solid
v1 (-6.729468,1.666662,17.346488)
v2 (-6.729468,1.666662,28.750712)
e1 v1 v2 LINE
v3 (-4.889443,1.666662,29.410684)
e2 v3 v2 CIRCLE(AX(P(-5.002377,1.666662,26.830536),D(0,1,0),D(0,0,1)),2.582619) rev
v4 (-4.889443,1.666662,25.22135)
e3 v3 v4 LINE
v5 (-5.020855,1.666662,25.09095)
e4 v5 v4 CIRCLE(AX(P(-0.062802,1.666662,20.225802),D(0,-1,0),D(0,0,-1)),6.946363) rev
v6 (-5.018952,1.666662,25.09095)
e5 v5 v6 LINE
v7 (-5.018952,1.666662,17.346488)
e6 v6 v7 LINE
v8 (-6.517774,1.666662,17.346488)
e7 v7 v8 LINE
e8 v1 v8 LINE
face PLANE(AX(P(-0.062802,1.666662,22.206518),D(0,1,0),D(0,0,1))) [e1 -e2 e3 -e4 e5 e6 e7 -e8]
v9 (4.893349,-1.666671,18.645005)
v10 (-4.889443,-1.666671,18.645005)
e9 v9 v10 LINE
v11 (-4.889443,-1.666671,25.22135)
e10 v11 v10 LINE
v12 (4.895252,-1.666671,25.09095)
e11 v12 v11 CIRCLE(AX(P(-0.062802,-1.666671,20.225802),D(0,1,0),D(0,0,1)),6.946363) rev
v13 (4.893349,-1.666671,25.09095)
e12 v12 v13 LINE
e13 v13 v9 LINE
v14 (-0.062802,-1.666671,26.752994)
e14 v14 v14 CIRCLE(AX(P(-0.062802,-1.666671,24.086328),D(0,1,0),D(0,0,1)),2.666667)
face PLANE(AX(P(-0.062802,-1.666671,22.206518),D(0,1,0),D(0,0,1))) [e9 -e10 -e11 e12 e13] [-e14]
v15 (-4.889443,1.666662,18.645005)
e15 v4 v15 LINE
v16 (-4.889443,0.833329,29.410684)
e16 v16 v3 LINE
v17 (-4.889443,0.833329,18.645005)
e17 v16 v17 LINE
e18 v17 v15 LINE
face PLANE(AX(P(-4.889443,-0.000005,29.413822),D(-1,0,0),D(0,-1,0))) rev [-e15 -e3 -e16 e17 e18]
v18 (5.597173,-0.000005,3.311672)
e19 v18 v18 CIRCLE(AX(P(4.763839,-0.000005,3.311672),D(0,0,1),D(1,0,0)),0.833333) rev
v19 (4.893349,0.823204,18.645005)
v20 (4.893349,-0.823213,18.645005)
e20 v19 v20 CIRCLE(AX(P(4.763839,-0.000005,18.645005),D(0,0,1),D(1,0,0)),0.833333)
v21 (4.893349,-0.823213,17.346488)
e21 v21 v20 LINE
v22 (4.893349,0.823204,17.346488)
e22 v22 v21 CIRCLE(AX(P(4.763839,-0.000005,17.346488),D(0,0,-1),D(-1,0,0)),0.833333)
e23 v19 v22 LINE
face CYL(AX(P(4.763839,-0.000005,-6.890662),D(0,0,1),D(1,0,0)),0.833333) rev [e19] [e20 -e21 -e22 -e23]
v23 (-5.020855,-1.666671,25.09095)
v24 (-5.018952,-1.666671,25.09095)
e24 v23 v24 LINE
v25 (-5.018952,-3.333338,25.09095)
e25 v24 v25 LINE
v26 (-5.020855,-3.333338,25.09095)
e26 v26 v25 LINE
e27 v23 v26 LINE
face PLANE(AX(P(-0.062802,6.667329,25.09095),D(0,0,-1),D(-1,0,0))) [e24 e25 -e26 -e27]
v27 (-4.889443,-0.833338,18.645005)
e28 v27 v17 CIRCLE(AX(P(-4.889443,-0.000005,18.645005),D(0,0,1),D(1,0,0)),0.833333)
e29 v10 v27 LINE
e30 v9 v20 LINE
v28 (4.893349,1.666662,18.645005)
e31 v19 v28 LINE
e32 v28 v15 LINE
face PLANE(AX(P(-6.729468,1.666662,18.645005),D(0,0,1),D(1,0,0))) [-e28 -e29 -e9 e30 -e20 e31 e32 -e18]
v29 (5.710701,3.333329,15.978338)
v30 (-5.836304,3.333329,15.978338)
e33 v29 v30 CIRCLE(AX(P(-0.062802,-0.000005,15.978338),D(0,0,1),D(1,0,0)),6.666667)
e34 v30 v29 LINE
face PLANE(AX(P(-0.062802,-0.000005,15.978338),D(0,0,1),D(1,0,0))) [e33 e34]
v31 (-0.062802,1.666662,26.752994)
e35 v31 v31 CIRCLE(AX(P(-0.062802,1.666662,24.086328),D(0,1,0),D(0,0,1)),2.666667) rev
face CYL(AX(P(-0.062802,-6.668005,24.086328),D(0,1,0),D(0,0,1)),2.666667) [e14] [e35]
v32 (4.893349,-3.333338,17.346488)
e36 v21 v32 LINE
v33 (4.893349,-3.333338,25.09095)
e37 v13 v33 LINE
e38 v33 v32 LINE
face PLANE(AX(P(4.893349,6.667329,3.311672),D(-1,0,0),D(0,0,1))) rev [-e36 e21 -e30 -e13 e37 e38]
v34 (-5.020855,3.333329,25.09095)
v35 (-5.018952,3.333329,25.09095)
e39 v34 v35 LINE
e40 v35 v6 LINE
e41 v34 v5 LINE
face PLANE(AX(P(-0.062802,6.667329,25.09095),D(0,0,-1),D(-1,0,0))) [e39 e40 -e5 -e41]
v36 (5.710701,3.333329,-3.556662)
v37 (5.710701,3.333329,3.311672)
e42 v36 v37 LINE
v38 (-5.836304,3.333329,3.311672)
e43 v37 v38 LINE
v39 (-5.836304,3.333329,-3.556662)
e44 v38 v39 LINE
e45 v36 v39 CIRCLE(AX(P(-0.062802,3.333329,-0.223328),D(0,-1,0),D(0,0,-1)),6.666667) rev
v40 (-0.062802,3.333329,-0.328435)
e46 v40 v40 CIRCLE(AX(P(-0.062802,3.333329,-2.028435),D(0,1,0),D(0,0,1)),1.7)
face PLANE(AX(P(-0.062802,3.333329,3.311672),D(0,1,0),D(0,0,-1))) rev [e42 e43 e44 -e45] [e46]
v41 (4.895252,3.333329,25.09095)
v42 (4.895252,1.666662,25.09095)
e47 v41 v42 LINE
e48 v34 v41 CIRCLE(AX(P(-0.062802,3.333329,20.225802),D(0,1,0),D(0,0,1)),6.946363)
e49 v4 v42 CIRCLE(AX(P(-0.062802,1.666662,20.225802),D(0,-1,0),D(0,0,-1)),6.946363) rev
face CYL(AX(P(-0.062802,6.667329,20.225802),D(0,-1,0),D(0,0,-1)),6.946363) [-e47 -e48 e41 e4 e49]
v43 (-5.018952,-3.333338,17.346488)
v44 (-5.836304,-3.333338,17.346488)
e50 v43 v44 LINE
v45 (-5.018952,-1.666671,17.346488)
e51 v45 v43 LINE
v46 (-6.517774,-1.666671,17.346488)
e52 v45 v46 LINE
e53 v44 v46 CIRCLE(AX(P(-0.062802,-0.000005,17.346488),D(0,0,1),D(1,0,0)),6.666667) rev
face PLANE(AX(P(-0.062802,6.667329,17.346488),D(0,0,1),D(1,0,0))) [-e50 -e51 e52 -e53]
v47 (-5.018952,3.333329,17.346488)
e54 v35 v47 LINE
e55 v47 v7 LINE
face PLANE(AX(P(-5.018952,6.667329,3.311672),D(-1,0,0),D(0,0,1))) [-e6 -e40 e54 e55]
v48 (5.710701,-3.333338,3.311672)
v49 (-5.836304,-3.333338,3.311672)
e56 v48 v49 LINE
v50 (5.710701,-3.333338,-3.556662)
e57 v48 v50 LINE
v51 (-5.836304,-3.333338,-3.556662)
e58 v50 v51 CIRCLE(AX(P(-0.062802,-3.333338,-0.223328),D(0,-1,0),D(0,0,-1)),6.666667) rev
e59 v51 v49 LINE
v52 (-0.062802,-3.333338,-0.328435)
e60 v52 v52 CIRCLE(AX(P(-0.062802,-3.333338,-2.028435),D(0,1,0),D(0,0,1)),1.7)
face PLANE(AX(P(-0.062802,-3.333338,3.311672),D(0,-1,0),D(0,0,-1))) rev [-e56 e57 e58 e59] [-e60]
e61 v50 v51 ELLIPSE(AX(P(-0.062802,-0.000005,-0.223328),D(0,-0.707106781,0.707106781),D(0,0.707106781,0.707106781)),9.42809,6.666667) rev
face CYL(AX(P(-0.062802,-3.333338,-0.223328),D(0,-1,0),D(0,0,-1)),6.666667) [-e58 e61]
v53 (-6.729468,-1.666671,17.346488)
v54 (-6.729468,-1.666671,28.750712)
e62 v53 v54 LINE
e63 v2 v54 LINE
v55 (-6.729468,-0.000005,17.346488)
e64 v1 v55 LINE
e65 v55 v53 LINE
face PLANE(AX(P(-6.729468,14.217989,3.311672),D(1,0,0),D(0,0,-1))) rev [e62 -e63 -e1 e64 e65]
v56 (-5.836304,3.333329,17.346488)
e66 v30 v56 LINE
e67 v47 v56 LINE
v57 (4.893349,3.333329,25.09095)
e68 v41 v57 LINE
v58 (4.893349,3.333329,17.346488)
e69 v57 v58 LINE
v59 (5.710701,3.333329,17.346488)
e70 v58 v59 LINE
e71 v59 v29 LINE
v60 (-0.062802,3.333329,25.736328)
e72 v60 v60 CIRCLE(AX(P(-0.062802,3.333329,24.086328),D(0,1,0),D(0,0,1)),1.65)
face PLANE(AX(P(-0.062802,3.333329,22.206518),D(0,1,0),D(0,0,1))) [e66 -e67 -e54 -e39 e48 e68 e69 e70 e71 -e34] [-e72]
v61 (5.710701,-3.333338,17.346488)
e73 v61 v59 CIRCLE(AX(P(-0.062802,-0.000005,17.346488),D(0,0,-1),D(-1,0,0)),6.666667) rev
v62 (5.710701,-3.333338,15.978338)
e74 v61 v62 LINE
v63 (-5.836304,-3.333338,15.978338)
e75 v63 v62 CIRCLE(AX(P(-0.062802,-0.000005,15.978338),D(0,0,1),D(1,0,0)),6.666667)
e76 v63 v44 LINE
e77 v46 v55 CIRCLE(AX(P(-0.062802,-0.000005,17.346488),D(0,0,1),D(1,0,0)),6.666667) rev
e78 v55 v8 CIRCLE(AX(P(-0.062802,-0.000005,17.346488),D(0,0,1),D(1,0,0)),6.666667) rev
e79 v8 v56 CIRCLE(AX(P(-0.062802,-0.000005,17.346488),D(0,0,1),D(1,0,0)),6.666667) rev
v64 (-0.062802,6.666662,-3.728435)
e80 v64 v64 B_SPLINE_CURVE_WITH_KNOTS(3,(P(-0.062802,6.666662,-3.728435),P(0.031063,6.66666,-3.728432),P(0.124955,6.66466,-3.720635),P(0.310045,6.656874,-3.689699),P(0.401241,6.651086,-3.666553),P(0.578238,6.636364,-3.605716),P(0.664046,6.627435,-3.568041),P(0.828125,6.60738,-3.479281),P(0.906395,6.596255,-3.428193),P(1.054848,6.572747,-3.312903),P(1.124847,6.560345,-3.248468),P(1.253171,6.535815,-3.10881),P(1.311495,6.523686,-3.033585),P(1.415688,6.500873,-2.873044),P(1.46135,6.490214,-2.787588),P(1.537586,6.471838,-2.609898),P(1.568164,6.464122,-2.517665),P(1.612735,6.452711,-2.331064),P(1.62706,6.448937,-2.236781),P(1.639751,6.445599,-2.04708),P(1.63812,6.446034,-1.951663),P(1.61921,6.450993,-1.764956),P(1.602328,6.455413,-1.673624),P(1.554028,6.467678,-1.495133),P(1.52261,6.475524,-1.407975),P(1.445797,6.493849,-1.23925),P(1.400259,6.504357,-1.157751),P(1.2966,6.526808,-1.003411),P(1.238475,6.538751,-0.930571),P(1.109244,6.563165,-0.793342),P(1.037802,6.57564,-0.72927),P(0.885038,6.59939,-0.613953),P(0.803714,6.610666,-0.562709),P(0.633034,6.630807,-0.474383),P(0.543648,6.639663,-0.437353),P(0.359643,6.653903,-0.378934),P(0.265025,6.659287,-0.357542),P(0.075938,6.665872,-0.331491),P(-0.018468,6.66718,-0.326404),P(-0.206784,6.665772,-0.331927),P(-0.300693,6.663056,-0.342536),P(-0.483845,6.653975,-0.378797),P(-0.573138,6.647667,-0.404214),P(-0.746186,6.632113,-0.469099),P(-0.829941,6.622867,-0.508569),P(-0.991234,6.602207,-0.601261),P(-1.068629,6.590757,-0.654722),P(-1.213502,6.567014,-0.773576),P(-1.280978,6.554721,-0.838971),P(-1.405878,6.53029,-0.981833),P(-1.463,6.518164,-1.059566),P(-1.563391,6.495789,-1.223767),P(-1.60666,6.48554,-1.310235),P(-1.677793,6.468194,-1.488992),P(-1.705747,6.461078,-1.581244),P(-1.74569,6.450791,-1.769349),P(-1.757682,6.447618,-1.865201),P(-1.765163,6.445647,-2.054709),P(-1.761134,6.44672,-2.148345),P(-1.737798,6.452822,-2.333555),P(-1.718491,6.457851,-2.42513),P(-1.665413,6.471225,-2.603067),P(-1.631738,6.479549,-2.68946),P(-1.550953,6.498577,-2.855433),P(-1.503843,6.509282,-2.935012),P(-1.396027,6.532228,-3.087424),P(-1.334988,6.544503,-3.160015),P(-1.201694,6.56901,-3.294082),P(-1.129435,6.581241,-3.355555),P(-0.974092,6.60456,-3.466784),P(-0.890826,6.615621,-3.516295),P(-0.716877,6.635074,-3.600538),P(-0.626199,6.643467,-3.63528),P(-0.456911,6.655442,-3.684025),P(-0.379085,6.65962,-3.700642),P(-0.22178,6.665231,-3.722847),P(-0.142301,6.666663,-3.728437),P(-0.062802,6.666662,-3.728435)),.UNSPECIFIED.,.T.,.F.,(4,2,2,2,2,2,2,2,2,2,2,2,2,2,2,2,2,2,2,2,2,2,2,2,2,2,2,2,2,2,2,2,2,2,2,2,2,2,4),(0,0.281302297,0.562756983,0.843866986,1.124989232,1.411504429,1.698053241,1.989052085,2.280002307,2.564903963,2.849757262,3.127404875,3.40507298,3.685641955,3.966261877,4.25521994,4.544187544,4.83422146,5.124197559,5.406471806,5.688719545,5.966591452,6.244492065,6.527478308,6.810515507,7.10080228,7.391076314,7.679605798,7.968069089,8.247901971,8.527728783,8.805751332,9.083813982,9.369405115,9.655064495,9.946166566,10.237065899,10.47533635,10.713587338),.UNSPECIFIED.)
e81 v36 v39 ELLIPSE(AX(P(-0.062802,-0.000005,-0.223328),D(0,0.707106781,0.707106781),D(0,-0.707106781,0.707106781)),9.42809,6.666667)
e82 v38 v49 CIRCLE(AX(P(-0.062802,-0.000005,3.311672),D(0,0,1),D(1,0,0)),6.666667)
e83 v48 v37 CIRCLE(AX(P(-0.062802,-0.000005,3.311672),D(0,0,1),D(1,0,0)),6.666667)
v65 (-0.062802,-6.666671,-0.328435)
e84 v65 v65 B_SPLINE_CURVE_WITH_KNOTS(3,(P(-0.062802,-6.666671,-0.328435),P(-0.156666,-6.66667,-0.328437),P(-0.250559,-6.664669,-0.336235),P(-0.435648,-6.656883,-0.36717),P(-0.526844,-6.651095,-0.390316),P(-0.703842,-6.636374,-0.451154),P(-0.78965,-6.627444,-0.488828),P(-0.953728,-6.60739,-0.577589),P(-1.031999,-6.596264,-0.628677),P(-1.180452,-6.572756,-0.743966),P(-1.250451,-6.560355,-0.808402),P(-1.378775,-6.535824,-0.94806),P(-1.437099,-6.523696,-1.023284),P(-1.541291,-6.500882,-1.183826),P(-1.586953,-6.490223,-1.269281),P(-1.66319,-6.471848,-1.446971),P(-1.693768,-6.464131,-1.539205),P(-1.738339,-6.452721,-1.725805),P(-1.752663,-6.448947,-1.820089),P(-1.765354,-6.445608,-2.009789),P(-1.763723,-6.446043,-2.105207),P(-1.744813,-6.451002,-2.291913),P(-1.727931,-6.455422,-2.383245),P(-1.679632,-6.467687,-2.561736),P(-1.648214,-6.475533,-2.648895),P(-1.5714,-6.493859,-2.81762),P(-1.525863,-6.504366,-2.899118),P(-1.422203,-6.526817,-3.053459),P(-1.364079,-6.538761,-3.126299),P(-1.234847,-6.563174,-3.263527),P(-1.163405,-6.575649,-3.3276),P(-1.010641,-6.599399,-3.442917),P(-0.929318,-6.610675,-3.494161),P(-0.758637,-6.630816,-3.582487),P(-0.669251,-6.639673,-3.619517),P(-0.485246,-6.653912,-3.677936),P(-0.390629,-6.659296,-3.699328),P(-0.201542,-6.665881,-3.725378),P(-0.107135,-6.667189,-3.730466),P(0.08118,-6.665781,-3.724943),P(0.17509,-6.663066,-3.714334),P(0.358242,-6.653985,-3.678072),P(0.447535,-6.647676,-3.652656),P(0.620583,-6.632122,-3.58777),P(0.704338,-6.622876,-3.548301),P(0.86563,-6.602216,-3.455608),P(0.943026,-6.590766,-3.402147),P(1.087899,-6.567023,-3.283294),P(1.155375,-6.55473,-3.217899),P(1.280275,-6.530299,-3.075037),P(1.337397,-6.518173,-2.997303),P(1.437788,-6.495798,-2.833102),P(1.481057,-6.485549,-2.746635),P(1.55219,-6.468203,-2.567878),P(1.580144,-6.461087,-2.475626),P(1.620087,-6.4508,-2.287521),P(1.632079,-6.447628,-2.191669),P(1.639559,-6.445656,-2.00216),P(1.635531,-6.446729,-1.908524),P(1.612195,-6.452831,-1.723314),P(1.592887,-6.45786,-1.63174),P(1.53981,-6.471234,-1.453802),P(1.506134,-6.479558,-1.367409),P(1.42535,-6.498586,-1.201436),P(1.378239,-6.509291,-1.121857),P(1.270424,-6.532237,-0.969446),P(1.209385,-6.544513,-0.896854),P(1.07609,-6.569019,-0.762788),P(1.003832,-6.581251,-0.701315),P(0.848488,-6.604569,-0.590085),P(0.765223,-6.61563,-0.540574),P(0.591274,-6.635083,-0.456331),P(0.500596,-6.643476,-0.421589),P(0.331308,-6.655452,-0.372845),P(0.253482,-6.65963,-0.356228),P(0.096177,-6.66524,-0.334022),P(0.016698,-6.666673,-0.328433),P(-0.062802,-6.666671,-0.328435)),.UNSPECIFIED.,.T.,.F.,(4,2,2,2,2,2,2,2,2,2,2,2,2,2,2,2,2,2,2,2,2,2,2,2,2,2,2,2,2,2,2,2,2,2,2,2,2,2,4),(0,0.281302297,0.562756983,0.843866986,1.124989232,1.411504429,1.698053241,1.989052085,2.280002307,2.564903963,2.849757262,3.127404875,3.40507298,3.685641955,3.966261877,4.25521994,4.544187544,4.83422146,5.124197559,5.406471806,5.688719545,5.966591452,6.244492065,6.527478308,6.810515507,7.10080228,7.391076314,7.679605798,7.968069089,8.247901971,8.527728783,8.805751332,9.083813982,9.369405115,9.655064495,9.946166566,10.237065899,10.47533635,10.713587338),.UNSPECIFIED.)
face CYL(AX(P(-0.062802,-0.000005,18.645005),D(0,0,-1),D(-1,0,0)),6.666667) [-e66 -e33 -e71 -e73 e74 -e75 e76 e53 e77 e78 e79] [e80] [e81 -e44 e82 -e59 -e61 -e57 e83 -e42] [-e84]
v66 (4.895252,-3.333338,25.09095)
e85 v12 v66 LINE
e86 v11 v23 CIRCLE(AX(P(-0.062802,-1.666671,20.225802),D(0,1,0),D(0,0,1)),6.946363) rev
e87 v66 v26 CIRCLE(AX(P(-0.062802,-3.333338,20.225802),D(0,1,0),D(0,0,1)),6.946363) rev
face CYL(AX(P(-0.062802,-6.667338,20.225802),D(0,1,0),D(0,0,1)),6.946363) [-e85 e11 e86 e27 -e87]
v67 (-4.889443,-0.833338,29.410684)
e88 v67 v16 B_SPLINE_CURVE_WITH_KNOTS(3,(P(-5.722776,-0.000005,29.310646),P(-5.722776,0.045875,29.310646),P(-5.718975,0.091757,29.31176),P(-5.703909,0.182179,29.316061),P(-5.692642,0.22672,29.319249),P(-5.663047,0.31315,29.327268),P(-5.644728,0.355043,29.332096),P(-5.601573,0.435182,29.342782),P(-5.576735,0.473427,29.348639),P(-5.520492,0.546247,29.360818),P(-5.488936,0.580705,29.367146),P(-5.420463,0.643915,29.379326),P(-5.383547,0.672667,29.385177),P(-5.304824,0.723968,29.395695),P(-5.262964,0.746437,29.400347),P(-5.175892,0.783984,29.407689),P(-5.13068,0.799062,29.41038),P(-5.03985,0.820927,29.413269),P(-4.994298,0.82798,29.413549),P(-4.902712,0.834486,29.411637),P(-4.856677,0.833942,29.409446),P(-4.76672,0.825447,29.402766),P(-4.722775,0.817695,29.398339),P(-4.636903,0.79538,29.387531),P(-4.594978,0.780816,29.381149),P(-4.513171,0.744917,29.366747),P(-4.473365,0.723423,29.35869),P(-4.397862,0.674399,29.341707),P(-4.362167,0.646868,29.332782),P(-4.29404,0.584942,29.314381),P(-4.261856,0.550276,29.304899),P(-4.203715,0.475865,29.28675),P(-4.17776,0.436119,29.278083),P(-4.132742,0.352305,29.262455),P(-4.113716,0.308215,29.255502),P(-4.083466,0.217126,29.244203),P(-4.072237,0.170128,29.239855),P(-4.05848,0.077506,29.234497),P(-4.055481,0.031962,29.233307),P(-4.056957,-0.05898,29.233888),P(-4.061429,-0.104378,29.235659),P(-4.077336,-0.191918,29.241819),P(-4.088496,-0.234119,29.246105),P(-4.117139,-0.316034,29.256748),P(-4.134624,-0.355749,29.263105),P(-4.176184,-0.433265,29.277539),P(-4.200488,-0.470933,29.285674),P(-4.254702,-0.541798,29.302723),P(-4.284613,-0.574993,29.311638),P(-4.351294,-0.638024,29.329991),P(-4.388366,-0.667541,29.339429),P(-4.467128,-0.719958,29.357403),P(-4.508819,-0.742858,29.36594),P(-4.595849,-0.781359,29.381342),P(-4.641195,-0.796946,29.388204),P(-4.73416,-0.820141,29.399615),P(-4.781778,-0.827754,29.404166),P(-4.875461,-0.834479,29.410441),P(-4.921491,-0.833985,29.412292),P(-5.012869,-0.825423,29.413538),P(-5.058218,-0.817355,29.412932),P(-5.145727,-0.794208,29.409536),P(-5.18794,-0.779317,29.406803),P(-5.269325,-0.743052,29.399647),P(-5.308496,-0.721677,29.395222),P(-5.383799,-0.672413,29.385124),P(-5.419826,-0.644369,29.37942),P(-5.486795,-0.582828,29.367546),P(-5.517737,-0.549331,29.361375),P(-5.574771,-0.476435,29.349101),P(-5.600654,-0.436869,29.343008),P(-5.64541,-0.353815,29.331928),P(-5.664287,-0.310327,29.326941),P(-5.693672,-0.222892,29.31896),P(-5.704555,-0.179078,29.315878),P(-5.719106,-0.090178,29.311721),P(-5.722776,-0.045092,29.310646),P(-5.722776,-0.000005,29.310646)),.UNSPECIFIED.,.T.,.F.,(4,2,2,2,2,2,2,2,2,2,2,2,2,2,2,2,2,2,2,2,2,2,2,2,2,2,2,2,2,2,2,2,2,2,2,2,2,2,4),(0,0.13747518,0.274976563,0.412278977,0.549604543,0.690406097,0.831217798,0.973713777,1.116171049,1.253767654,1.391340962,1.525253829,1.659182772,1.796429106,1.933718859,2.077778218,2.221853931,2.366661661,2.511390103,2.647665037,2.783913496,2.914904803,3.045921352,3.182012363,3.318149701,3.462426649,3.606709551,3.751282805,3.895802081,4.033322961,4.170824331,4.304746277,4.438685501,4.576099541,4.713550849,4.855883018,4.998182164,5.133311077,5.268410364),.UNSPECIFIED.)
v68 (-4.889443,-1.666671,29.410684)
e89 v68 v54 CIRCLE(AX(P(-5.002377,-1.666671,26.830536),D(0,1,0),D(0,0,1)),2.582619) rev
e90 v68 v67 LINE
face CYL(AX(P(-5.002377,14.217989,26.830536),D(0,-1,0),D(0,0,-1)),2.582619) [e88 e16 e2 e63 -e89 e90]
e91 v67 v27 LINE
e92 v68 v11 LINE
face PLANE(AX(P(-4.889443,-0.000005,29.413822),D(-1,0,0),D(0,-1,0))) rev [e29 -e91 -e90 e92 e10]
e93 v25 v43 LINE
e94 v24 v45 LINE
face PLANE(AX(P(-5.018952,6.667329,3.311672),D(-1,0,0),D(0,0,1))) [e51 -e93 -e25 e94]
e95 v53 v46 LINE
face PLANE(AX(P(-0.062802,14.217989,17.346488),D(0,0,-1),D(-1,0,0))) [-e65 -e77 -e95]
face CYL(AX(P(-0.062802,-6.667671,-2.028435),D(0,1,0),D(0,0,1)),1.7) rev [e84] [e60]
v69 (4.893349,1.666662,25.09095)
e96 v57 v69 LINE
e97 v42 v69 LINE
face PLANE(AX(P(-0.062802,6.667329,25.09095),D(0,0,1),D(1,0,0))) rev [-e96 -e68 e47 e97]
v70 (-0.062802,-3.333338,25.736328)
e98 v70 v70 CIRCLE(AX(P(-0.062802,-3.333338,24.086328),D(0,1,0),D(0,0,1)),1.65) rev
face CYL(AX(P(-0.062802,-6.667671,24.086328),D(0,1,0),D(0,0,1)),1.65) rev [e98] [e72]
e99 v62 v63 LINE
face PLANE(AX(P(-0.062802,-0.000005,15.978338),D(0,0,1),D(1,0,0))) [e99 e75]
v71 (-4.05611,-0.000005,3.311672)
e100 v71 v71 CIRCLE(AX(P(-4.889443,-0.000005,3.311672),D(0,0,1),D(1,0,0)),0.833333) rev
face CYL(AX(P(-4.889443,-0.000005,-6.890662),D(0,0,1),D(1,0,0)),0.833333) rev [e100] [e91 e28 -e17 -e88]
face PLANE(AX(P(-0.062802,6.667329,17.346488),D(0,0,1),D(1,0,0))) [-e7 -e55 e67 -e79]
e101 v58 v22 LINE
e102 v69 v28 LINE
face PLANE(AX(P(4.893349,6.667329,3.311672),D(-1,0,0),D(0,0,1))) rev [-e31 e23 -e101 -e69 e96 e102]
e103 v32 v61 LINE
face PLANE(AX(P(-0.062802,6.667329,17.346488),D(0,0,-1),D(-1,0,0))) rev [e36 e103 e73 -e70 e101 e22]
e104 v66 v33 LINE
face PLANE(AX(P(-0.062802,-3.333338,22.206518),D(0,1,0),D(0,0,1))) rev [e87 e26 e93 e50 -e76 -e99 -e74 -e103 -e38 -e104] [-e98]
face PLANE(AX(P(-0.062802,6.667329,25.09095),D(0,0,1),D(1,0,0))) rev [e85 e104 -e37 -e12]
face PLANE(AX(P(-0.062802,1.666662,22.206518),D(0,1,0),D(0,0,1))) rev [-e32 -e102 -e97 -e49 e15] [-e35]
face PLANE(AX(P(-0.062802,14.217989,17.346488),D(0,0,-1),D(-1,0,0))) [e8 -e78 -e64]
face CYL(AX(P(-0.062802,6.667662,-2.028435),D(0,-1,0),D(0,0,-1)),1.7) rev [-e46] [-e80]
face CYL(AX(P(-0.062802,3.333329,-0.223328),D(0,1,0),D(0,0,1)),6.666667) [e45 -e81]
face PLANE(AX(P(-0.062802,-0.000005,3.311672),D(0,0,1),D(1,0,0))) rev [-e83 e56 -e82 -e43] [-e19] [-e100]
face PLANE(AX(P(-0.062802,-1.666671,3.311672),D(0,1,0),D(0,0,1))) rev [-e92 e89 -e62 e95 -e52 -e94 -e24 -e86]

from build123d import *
from build123d.topology import SkipClean

# Parameters (mm, degrees)
SKETCH2_R                       = 10
PHALANGE_LENGTH_DEPTH           = 23
BOSS_EXTRUDE3_DEPTH             = 5
BOSS_EXTRUDE4_DEPTH             = 5
BOSS_EXTRUDE4_DEPTH_BACK        = 5
CUT_EXTRUDE2_START              = -15.3025
CUT_EXTRUDE2_DEPTH              = 15.3025
SKETCH7_R                       = 1.65
CUT_EXTRUDE3_DEPTH              = 10
CUT_EXTRUDE4_DEPTH              = 2.5
CUT_EXTRUDE4_DEPTH_BACK         = 2.5
CUT_EXTRUDE7_REACH              = 44.378
SKETCH4_R                       = 1.65
CUT_EXTRUDE7_DIRECTION_2_REACH  = 44.378
CUT_EXTRUDE_THIN1_START         = 23
CUT_EXTRUDE_THIN1_DEPTH         = 10.361670454
BOSS_EXTRUDE5_REACH             = 43.559
SKETCH9_R                       = 4
SKETCH9_R_2                     = 1.65
CUT_EXTRUDE8_REACH              = 42.83
SKETCH10_R                      = 1.25
CUT_EXTRUDE9_START              = -4
CUT_EXTRUDE9_DEPTH              = 4
CUT_EXTRUDE10_REACH             = 43.559
CUT_EXTRUDE10_DIRECTION_2_REACH = 43.559
CUT_EXTRUDE11_START             = -10
CUT_EXTRUDE11_OUTLINE_W         = 2.565773848
CUT_EXTRUDE11_OUTLINE_H         = 11.6166929
CUT_EXTRUDE11_DEPTH             = 10
BOSS_EXTRUDE7_REACH             = 41.207
CUT_EXTRUDE12_REACH             = 42.83
SKETCH10_2_R                    = 1.25
CUT_EXTRUDE12_DIRECTION_2_REACH = 42.83
SKETCH17_R                      = 1.25
SKETCH17_W                      = 2.42123439
SKETCH17_H                      = 5
CUT_EXTRUDE14_DEPTH             = 16.148519
SCALE1_SCALE                    = 0.666666667
CUT_EXTRUDE15_START             = -10
SKETCH18_R                      = 1.65
CUT_EXTRUDE15_DEPTH             = 13.333338
CUT_EXTRUDE16_START             = -3.333333
SKETCH19_R                      = 1.7
CUT_EXTRUDE16_DEPTH             = 13.333338


# Read off the part's stored shape, not the designer's step: Cut-Extrude-Thin1, Cut-Extrude11
with BuildPart() as part:
    # Sketch2 → Phalange Length (new body)
    with BuildSketch(Plane.XY):
        Circle(SKETCH2_R)
    extrude(amount=PHALANGE_LENGTH_DEPTH)

    # Sketch3 → Boss-Extrude3 (add)
    with BuildSketch(Plane(origin=(0, -10, 0), x_dir=(-1, 0, 0), z_dir=(0, -1, 0))):
        with BuildLine():
            Line((-10, 5.302499701), (-10, 0))
            Line((-10, 0), (10, 0))
            Line((10, 0), (10, 5.302499701))
            ThreePointArc((10, 5.302499701), (0, 15.302499701), (-10, 5.302499701))
        make_face()
    boss_extrude3 = extrude(amount=-BOSS_EXTRUDE3_DEPTH)

    # Mirror1: Boss-Extrude3 across plane
    add(boss_extrude3.mirror(Plane.ZX))

    # Sketch5 → Boss-Extrude4 (add, two sides: drawn at the far end of the back side and taken through both)
    with BuildSketch(Plane(origin=(0, 0, 0), x_dir=(1, 0, 0), z_dir=(0, 1, 0)).offset(-BOSS_EXTRUDE4_DEPTH_BACK)):
        with BuildLine():
            Line((-10, -28.783157911), (-10, -23))
            Line((-10, -23), (10, -23))
            Line((10, -23), (10, -28.783157911))
            ThreePointArc((10, -28.783157911), (0, -38.351984156), (-10, -28.783157911))
        make_face()
    extrude(amount=BOSS_EXTRUDE4_DEPTH + BOSS_EXTRUDE4_DEPTH_BACK)

    # Sketch6 → Cut-Extrude2 (cut)
    with SkipClean():  # the faces are left unmerged after this step: merging them gives an invalid solid
        with BuildSketch(Plane.XY.offset(CUT_EXTRUDE2_START)):
            with BuildLine():
                ThreePointArc((0, 10), (5, 8.660254038), (8.660254038, 5))
                Line((8.660254038, 5), (10, 5))
                Line((10, 5), (10, 10))
                Line((10, 10), (0, 10))
            make_face()
            with BuildLine():
                Line((10, -5), (8.660254038, -5))
                ThreePointArc((8.660254038, -5), (5, -8.660254038), (0, -10))
                Line((0, -10), (10, -10))
                Line((10, -10), (10, -5))
            make_face()
            with BuildLine():
                ThreePointArc((-8.660254038, 5), (-5, 8.660254038), (0, 10))
                Line((0, 10), (-10, 10))
                Line((-10, 10), (-10, 5))
                Line((-10, 5), (-8.660254038, 5))
            make_face()
            with BuildLine():
                Line((-10, -10), (0, -10))
                ThreePointArc((0, -10), (-5, -8.660254038), (-8.660254038, -5))
                Line((-8.660254038, -5), (-10, -5))
                Line((-10, -5), (-10, -10))
            make_face()
        extrude(amount=CUT_EXTRUDE2_DEPTH, mode=Mode.SUBTRACT)

    # Sketch7 → Cut-Extrude3 (cut)
    with SkipClean():  # the faces are left unmerged after this step: merging them gives an invalid solid
        with BuildSketch(Plane(origin=(0, 5, 0), x_dir=(1, 0, 0), z_dir=(0, 1, 0))):
            with Locations(Location((0, -31.161984156, 0), (0, 0, 270))):
                Circle(SKETCH7_R)
        extrude(amount=-CUT_EXTRUDE3_DEPTH, mode=Mode.SUBTRACT)

    # Sketch5<2> → Cut-Extrude4 (cut, two sides: drawn at the far end of the back side and taken through both)
    with BuildSketch(Plane(origin=(0, 0, 0), x_dir=(1, 0, 0), z_dir=(0, 1, 0)).offset(-CUT_EXTRUDE4_DEPTH_BACK)):
        with BuildLine():
            Line((-10, -28.783157911), (-10, -23))
            Line((-10, -23), (10, -23))
            Line((10, -23), (10, -28.783157911))
            ThreePointArc((10, -28.783157911), (0, -38.351984156), (-10, -28.783157911))
        make_face()
    extrude(amount=CUT_EXTRUDE4_DEPTH + CUT_EXTRUDE4_DEPTH_BACK, mode=Mode.SUBTRACT)

    # Sketch4 → Cut-Extrude7 (cut, up to next)
    with BuildSketch(Plane(origin=(0, -5, 0), x_dir=(1, 0, 0), z_dir=(0, 1, 0)), mode=Mode.PRIVATE) as cut_extrude7_sk1:
        with Locations(Location((0, 8.010159673, 0), (0, 0, 270))):
            Circle(SKETCH4_R)
    cut_extrude7_tool1 = extrude(cut_extrude7_sk1.sketch, amount=-CUT_EXTRUDE7_REACH, mode=Mode.PRIVATE) & part.part
    add(cut_extrude7_tool1.solids().sort_by_distance((0, -5, -8.01016))[0], mode=Mode.SUBTRACT)

    # Sketch4 → Cut-Extrude7 direction 2 (cut, up to next)
    with BuildSketch(Plane(origin=(0, -5, 0), x_dir=(1, 0, 0), z_dir=(0, 1, 0)), mode=Mode.PRIVATE) as cut_extrude7_direction_2_sk1:
        with Locations(Location((0, 8.010159673, 0), (0, 0, 270))):
            Circle(SKETCH4_R)
    cut_extrude7_direction_2_tool1 = extrude(cut_extrude7_direction_2_sk1.sketch, amount=CUT_EXTRUDE7_DIRECTION_2_REACH, mode=Mode.PRIVATE) & part.part
    add(cut_extrude7_direction_2_tool1.solids().sort_by_distance((0, -5, -8.01016))[0], mode=Mode.SUBTRACT)

    # Cut-Extrude-Thin1 outline → Cut-Extrude-Thin1 (cut)
    with SkipClean():  # the faces are left unmerged after this step: merging them gives an invalid solid
        with BuildSketch(Plane.XY.offset(CUT_EXTRUDE_THIN1_START)):
            with BuildLine():
                ThreePointArc((8.660254038, 5), (9.256147934, 3.78466979), (9.682458366, 2.5))
                Line((9.682458366, 2.5), (10, 2.5))
                Line((10, 2.5), (10, 5))
                Line((10, 5), (8.660254038, 5))
            make_face()
            with BuildLine():
                Line((10, -2.5), (9.682458366, -2.5))
                ThreePointArc((9.682458366, -2.5), (9.256147934, -3.78466979), (8.660254038, -5))
                Line((8.660254038, -5), (10, -5))
                Line((10, -5), (10, -2.5))
            make_face()
            with BuildLine():
                Line((-10, 2.5), (-9.682458366, 2.5))
                ThreePointArc((-9.682458366, 2.5), (-9.256147934, 3.78466979), (-8.660254038, 5))
                Line((-8.660254038, 5), (-10, 5))
                Line((-10, 5), (-10, 2.5))
            make_face()
            with BuildLine():
                ThreePointArc((-8.660254038, -5), (-9.256147934, -3.78466979), (-9.682458366, -2.5))
                Line((-9.682458366, -2.5), (-10, -2.5))
                Line((-10, -2.5), (-10, -5))
                Line((-10, -5), (-8.660254038, -5))
            make_face()
        extrude(amount=CUT_EXTRUDE_THIN1_DEPTH, mode=Mode.SUBTRACT)

    # Sketch9 → Boss-Extrude5 (add, up to next)
    with BuildSketch(Plane.XZ.offset(-2.5), mode=Mode.PRIVATE) as boss_extrude5_sk1:
        with Locations(Location((0, 31.161984156, 0), (0, 0, 90))):
            Circle(SKETCH9_R)
        with Locations(Location((0, 31.161984156, 0), (0, 0, 90))):
            Circle(SKETCH9_R_2, mode=Mode.SUBTRACT)
    boss_extrude5_tool1 = extrude(boss_extrude5_sk1.sketch, amount=BOSS_EXTRUDE5_REACH, mode=Mode.PRIVATE) - part.part
    add(boss_extrude5_tool1.solids().sort_by_distance((0, 2.5, 27.275121))[0])

    # Sketch10 → Cut-Extrude8 (cut, up to next)
    with BuildSketch(Plane.XY.offset(23), mode=Mode.PRIVATE) as cut_extrude8_sk1:
        with Locations((7.239961745, 0)):
            Circle(SKETCH10_R)
    cut_extrude8_tool1 = extrude(cut_extrude8_sk1.sketch, amount=-CUT_EXTRUDE8_REACH, mode=Mode.PRIVATE) & part.part
    # Sketch10 → Cut-Extrude8 (cut, up to next)
    with BuildSketch(Plane.XY.offset(23), mode=Mode.PRIVATE) as cut_extrude8_sk2:
        with Locations((-7.239961745, 0)):
            Circle(SKETCH10_R)
    cut_extrude8_tool2 = extrude(cut_extrude8_sk2.sketch, amount=-CUT_EXTRUDE8_REACH, mode=Mode.PRIVATE) & part.part
    add(cut_extrude8_tool1.solids().sort_by_distance((7.239962, 0, 23))[0], mode=Mode.SUBTRACT)
    add(cut_extrude8_tool2.solids().sort_by_distance((-7.239962, 0, 23))[0], mode=Mode.SUBTRACT)

    # Sketch11 → Cut-Extrude9 (cut)
    with SkipClean():  # the faces are left unmerged after this step: merging them gives an invalid solid
        with BuildSketch(Plane.XY.offset(23).offset(CUT_EXTRUDE9_START)):
            with BuildLine():
                ThreePointArc((8.660254038, 5), (0, 10), (-8.660254038, 5))
                Line((-8.660254038, 5), (8.660254038, 5))
            make_face()
            with BuildLine():
                Line((8.660254038, -5), (-8.660254038, -5))
                ThreePointArc((-8.660254038, -5), (0, -10), (8.660254038, -5))
            make_face()
        extrude(amount=CUT_EXTRUDE9_DEPTH, mode=Mode.SUBTRACT)

    # Sketch12 → Cut-Extrude10 (cut, up to next)
    with BuildSketch(Plane.XZ.offset(-2.5), mode=Mode.PRIVATE) as cut_extrude10_sk1:
        with BuildLine():
            Line((-10.033719202, 38.351984156), (-10.033719202, 31.164892021))
            Line((-10.033719202, 31.164892021), (-8.660254038, 31.164892021))
            ThreePointArc((-8.660254038, 31.164892021), (0, 35.790740593), (8.660254038, 31.164892021))
            Line((8.660254038, 31.164892021), (10.033719202, 31.164892021))
            Line((10.033719202, 31.164892021), (10.033719202, 38.351984156))
            Line((10.033719202, 38.351984156), (-10.033719202, 38.351984156))
        make_face()
    cut_extrude10_tool1 = extrude(cut_extrude10_sk1.sketch, amount=CUT_EXTRUDE10_REACH, mode=Mode.PRIVATE) & part.part
    add(cut_extrude10_tool1.solids().sort_by_distance((0, 2.5, 35.850279))[0], mode=Mode.SUBTRACT)

    # Sketch12 → Cut-Extrude10 direction 2 (cut, up to next)
    with BuildSketch(Plane.XZ.offset(-2.5), mode=Mode.PRIVATE) as cut_extrude10_direction_2_sk1:
        with BuildLine():
            Line((-10.033719202, 38.351984156), (-10.033719202, 31.164892021))
            Line((-10.033719202, 31.164892021), (-8.660254038, 31.164892021))
            ThreePointArc((-8.660254038, 31.164892021), (0, 35.790740593), (8.660254038, 31.164892021))
            Line((8.660254038, 31.164892021), (10.033719202, 31.164892021))
            Line((10.033719202, 31.164892021), (10.033719202, 38.351984156))
            Line((10.033719202, 38.351984156), (-10.033719202, 38.351984156))
        make_face()
    cut_extrude10_direction_2_tool1 = extrude(cut_extrude10_direction_2_sk1.sketch, amount=-CUT_EXTRUDE10_DIRECTION_2_REACH, mode=Mode.PRIVATE) & part.part
    add(cut_extrude10_direction_2_tool1.solids().sort_by_distance((0, 2.5, 35.850279))[0], mode=Mode.SUBTRACT)

    # Cut-Extrude11 outline → Cut-Extrude11 (cut)
    with BuildSketch(Plane.XZ.offset(5).offset(CUT_EXTRUDE11_START)):
        with Locations((-8.717113076, 26.860571369)):
            Rectangle(CUT_EXTRUDE11_OUTLINE_W, CUT_EXTRUDE11_OUTLINE_H)
        with Locations((8.717113076, 26.860571369)):
            Rectangle(CUT_EXTRUDE11_OUTLINE_W, CUT_EXTRUDE11_OUTLINE_H)
    extrude(amount=CUT_EXTRUDE11_DEPTH, mode=Mode.SUBTRACT)

    # Boss-Extrude7: up to this face of the body (flat: up to its plane)
    boss_extrude7_end = Plane(part.part.faces().sort_by_distance((0, 2.5, 23.196174341))[0])
    # Sketch16 → Boss-Extrude7 (add, up to the picked face)
    with BuildSketch(Plane(origin=(0, -2.5, 0), x_dir=(1, 0, 0), z_dir=(0, 1, 0)), mode=Mode.PRIVATE) as boss_extrude7_sk1:
        with BuildLine():
            Line((-4.818727355, -21.052224919), (-7.434226152, -21.052224919))
            Line((-7.434226152, -21.052224919), (-10, -21.052224919))
            Line((-10, -21.052224919), (-10, -38.158561033))
            ThreePointArc((-10, -38.158561033), (-8.808295471, -38.890817912), (-7.43422564, -39.152145139))
            ThreePointArc((-7.43422564, -39.152145139), (-6.033645007, -38.899721533), (-4.818727355, -38.158561033))
            Line((-4.818727355, -38.158561033), (-4.818727355, -34.609527951))
            ThreePointArc((-4.818727355, -34.609527951), (-6.204248493, -33.742230104), (-7.437080645, -32.668917819))
            Line((-7.437080645, -32.668917819), (-7.434226152, -32.668917819))
            Line((-7.434226152, -32.668917819), (-7.434226152, -23))
            Line((-7.434226152, -23), (-4.818727355, -23))
            Line((-4.818727355, -23), (-4.818727355, -21.052224919))
        make_face()
    boss_extrude7_tool1 = split(extrude(boss_extrude7_sk1.sketch, amount=BOSS_EXTRUDE7_REACH, mode=Mode.PRIVATE), bisect_by=boss_extrude7_end, keep=Keep.BOTH, mode=Mode.PRIVATE)
    # Sketch16 → Boss-Extrude7 (add, up to the picked face)
    with BuildSketch(Plane(origin=(0, -2.5, 0), x_dir=(1, 0, 0), z_dir=(0, 1, 0)), mode=Mode.PRIVATE) as boss_extrude7_sk2:
        with BuildLine():
            Line((-4.818727355, -34.609527951), (-4.818727355, -23))
            Line((-4.818727355, -23), (-7.434226152, -23))
            Line((-7.434226152, -23), (-7.434226152, -32.668917819))
            Line((-7.434226152, -32.668917819), (-7.437080645, -32.668917819))
            ThreePointArc((-7.437080645, -32.668917819), (-6.204248493, -33.742230104), (-4.818727355, -34.609527951))
        make_face()
    boss_extrude7_tool2 = split(extrude(boss_extrude7_sk2.sketch, amount=BOSS_EXTRUDE7_REACH, mode=Mode.PRIVATE), bisect_by=boss_extrude7_end, keep=Keep.BOTH, mode=Mode.PRIVATE)
    add(boss_extrude7_tool1.solids().sort_by(Axis((-7.989429, -2.5, 30.633344), (0, 1, 0)))[0])
    add(boss_extrude7_tool2.solids().sort_by(Axis((-6.08748, -2.5, 28.3879), (0, 1, 0)))[0])

    # Sketch10<2> → Cut-Extrude12 (cut, up to next)
    with BuildSketch(Plane.XY.offset(23), mode=Mode.PRIVATE) as cut_extrude12_sk1:
        with Locations((-7.239961745, 0)):
            Circle(SKETCH10_2_R)
    cut_extrude12_tool1 = extrude(cut_extrude12_sk1.sketch, amount=CUT_EXTRUDE12_REACH, mode=Mode.PRIVATE) & part.part
    add(cut_extrude12_tool1.solids().sort_by_distance((-7.239962, 0, 23))[0], mode=Mode.SUBTRACT)

    # Sketch10<2> → Cut-Extrude12 direction 2 (cut, up to next)
    with BuildSketch(Plane.XY.offset(23), mode=Mode.PRIVATE) as cut_extrude12_direction_2_sk1:
        with Locations((-7.239961745, 0)):
            Circle(SKETCH10_2_R)
    cut_extrude12_direction_2_tool1 = extrude(cut_extrude12_direction_2_sk1.sketch, amount=-CUT_EXTRUDE12_DIRECTION_2_REACH, mode=Mode.PRIVATE) & part.part
    add(cut_extrude12_direction_2_tool1.solids().sort_by_distance((-7.239962, 0, 23))[0], mode=Mode.SUBTRACT)

    # Sketch17 → Cut-Extrude14 (cut)
    with SkipClean():  # the faces are left unmerged after this step: merging them gives an invalid solid
        with BuildSketch(Plane.XY.offset(23)):
            with Locations((-7.239961745, 0)):
                Circle(SKETCH17_R)
            with Locations((-6.02934455, 0)):
                Rectangle(SKETCH17_W, SKETCH17_H)
        extrude(amount=CUT_EXTRUDE14_DEPTH, mode=Mode.SUBTRACT)


with BuildPart() as part_1:
    # Scale1: scaled about (-0.18837751, -1.72e-07, 9.934517088)
    add(part.part.scale(SCALE1_SCALE).moved(Location((-0.062792503, -5.7e-08, 3.311505696))))

    # Sketch18 → Cut-Extrude15 (cut)
    with BuildSketch(Plane(origin=(0, 3.3333287, 0), x_dir=(1, 0, 0), z_dir=(0, 1, 0)).offset(CUT_EXTRUDE15_START)):
        with Locations(Location((-0.062801677, -24.086327732, 0), (0, 0, 270))):
            Circle(SKETCH18_R)
    extrude(amount=CUT_EXTRUDE15_DEPTH, mode=Mode.SUBTRACT)

    # Sketch19 → Cut-Extrude16 (cut)
    with BuildSketch(Plane(origin=(0, -3.333337967, 0), x_dir=(1, 0, 0), z_dir=(0, 1, 0)).offset(CUT_EXTRUDE16_START)):
        with Locations(Location((-0.062801677, 2.02843482, 0), (0, 0, 90))):
            Circle(SKETCH19_R)
    extrude(amount=CUT_EXTRUDE16_DEPTH, mode=Mode.SUBTRACT)


solid = part_1.part
